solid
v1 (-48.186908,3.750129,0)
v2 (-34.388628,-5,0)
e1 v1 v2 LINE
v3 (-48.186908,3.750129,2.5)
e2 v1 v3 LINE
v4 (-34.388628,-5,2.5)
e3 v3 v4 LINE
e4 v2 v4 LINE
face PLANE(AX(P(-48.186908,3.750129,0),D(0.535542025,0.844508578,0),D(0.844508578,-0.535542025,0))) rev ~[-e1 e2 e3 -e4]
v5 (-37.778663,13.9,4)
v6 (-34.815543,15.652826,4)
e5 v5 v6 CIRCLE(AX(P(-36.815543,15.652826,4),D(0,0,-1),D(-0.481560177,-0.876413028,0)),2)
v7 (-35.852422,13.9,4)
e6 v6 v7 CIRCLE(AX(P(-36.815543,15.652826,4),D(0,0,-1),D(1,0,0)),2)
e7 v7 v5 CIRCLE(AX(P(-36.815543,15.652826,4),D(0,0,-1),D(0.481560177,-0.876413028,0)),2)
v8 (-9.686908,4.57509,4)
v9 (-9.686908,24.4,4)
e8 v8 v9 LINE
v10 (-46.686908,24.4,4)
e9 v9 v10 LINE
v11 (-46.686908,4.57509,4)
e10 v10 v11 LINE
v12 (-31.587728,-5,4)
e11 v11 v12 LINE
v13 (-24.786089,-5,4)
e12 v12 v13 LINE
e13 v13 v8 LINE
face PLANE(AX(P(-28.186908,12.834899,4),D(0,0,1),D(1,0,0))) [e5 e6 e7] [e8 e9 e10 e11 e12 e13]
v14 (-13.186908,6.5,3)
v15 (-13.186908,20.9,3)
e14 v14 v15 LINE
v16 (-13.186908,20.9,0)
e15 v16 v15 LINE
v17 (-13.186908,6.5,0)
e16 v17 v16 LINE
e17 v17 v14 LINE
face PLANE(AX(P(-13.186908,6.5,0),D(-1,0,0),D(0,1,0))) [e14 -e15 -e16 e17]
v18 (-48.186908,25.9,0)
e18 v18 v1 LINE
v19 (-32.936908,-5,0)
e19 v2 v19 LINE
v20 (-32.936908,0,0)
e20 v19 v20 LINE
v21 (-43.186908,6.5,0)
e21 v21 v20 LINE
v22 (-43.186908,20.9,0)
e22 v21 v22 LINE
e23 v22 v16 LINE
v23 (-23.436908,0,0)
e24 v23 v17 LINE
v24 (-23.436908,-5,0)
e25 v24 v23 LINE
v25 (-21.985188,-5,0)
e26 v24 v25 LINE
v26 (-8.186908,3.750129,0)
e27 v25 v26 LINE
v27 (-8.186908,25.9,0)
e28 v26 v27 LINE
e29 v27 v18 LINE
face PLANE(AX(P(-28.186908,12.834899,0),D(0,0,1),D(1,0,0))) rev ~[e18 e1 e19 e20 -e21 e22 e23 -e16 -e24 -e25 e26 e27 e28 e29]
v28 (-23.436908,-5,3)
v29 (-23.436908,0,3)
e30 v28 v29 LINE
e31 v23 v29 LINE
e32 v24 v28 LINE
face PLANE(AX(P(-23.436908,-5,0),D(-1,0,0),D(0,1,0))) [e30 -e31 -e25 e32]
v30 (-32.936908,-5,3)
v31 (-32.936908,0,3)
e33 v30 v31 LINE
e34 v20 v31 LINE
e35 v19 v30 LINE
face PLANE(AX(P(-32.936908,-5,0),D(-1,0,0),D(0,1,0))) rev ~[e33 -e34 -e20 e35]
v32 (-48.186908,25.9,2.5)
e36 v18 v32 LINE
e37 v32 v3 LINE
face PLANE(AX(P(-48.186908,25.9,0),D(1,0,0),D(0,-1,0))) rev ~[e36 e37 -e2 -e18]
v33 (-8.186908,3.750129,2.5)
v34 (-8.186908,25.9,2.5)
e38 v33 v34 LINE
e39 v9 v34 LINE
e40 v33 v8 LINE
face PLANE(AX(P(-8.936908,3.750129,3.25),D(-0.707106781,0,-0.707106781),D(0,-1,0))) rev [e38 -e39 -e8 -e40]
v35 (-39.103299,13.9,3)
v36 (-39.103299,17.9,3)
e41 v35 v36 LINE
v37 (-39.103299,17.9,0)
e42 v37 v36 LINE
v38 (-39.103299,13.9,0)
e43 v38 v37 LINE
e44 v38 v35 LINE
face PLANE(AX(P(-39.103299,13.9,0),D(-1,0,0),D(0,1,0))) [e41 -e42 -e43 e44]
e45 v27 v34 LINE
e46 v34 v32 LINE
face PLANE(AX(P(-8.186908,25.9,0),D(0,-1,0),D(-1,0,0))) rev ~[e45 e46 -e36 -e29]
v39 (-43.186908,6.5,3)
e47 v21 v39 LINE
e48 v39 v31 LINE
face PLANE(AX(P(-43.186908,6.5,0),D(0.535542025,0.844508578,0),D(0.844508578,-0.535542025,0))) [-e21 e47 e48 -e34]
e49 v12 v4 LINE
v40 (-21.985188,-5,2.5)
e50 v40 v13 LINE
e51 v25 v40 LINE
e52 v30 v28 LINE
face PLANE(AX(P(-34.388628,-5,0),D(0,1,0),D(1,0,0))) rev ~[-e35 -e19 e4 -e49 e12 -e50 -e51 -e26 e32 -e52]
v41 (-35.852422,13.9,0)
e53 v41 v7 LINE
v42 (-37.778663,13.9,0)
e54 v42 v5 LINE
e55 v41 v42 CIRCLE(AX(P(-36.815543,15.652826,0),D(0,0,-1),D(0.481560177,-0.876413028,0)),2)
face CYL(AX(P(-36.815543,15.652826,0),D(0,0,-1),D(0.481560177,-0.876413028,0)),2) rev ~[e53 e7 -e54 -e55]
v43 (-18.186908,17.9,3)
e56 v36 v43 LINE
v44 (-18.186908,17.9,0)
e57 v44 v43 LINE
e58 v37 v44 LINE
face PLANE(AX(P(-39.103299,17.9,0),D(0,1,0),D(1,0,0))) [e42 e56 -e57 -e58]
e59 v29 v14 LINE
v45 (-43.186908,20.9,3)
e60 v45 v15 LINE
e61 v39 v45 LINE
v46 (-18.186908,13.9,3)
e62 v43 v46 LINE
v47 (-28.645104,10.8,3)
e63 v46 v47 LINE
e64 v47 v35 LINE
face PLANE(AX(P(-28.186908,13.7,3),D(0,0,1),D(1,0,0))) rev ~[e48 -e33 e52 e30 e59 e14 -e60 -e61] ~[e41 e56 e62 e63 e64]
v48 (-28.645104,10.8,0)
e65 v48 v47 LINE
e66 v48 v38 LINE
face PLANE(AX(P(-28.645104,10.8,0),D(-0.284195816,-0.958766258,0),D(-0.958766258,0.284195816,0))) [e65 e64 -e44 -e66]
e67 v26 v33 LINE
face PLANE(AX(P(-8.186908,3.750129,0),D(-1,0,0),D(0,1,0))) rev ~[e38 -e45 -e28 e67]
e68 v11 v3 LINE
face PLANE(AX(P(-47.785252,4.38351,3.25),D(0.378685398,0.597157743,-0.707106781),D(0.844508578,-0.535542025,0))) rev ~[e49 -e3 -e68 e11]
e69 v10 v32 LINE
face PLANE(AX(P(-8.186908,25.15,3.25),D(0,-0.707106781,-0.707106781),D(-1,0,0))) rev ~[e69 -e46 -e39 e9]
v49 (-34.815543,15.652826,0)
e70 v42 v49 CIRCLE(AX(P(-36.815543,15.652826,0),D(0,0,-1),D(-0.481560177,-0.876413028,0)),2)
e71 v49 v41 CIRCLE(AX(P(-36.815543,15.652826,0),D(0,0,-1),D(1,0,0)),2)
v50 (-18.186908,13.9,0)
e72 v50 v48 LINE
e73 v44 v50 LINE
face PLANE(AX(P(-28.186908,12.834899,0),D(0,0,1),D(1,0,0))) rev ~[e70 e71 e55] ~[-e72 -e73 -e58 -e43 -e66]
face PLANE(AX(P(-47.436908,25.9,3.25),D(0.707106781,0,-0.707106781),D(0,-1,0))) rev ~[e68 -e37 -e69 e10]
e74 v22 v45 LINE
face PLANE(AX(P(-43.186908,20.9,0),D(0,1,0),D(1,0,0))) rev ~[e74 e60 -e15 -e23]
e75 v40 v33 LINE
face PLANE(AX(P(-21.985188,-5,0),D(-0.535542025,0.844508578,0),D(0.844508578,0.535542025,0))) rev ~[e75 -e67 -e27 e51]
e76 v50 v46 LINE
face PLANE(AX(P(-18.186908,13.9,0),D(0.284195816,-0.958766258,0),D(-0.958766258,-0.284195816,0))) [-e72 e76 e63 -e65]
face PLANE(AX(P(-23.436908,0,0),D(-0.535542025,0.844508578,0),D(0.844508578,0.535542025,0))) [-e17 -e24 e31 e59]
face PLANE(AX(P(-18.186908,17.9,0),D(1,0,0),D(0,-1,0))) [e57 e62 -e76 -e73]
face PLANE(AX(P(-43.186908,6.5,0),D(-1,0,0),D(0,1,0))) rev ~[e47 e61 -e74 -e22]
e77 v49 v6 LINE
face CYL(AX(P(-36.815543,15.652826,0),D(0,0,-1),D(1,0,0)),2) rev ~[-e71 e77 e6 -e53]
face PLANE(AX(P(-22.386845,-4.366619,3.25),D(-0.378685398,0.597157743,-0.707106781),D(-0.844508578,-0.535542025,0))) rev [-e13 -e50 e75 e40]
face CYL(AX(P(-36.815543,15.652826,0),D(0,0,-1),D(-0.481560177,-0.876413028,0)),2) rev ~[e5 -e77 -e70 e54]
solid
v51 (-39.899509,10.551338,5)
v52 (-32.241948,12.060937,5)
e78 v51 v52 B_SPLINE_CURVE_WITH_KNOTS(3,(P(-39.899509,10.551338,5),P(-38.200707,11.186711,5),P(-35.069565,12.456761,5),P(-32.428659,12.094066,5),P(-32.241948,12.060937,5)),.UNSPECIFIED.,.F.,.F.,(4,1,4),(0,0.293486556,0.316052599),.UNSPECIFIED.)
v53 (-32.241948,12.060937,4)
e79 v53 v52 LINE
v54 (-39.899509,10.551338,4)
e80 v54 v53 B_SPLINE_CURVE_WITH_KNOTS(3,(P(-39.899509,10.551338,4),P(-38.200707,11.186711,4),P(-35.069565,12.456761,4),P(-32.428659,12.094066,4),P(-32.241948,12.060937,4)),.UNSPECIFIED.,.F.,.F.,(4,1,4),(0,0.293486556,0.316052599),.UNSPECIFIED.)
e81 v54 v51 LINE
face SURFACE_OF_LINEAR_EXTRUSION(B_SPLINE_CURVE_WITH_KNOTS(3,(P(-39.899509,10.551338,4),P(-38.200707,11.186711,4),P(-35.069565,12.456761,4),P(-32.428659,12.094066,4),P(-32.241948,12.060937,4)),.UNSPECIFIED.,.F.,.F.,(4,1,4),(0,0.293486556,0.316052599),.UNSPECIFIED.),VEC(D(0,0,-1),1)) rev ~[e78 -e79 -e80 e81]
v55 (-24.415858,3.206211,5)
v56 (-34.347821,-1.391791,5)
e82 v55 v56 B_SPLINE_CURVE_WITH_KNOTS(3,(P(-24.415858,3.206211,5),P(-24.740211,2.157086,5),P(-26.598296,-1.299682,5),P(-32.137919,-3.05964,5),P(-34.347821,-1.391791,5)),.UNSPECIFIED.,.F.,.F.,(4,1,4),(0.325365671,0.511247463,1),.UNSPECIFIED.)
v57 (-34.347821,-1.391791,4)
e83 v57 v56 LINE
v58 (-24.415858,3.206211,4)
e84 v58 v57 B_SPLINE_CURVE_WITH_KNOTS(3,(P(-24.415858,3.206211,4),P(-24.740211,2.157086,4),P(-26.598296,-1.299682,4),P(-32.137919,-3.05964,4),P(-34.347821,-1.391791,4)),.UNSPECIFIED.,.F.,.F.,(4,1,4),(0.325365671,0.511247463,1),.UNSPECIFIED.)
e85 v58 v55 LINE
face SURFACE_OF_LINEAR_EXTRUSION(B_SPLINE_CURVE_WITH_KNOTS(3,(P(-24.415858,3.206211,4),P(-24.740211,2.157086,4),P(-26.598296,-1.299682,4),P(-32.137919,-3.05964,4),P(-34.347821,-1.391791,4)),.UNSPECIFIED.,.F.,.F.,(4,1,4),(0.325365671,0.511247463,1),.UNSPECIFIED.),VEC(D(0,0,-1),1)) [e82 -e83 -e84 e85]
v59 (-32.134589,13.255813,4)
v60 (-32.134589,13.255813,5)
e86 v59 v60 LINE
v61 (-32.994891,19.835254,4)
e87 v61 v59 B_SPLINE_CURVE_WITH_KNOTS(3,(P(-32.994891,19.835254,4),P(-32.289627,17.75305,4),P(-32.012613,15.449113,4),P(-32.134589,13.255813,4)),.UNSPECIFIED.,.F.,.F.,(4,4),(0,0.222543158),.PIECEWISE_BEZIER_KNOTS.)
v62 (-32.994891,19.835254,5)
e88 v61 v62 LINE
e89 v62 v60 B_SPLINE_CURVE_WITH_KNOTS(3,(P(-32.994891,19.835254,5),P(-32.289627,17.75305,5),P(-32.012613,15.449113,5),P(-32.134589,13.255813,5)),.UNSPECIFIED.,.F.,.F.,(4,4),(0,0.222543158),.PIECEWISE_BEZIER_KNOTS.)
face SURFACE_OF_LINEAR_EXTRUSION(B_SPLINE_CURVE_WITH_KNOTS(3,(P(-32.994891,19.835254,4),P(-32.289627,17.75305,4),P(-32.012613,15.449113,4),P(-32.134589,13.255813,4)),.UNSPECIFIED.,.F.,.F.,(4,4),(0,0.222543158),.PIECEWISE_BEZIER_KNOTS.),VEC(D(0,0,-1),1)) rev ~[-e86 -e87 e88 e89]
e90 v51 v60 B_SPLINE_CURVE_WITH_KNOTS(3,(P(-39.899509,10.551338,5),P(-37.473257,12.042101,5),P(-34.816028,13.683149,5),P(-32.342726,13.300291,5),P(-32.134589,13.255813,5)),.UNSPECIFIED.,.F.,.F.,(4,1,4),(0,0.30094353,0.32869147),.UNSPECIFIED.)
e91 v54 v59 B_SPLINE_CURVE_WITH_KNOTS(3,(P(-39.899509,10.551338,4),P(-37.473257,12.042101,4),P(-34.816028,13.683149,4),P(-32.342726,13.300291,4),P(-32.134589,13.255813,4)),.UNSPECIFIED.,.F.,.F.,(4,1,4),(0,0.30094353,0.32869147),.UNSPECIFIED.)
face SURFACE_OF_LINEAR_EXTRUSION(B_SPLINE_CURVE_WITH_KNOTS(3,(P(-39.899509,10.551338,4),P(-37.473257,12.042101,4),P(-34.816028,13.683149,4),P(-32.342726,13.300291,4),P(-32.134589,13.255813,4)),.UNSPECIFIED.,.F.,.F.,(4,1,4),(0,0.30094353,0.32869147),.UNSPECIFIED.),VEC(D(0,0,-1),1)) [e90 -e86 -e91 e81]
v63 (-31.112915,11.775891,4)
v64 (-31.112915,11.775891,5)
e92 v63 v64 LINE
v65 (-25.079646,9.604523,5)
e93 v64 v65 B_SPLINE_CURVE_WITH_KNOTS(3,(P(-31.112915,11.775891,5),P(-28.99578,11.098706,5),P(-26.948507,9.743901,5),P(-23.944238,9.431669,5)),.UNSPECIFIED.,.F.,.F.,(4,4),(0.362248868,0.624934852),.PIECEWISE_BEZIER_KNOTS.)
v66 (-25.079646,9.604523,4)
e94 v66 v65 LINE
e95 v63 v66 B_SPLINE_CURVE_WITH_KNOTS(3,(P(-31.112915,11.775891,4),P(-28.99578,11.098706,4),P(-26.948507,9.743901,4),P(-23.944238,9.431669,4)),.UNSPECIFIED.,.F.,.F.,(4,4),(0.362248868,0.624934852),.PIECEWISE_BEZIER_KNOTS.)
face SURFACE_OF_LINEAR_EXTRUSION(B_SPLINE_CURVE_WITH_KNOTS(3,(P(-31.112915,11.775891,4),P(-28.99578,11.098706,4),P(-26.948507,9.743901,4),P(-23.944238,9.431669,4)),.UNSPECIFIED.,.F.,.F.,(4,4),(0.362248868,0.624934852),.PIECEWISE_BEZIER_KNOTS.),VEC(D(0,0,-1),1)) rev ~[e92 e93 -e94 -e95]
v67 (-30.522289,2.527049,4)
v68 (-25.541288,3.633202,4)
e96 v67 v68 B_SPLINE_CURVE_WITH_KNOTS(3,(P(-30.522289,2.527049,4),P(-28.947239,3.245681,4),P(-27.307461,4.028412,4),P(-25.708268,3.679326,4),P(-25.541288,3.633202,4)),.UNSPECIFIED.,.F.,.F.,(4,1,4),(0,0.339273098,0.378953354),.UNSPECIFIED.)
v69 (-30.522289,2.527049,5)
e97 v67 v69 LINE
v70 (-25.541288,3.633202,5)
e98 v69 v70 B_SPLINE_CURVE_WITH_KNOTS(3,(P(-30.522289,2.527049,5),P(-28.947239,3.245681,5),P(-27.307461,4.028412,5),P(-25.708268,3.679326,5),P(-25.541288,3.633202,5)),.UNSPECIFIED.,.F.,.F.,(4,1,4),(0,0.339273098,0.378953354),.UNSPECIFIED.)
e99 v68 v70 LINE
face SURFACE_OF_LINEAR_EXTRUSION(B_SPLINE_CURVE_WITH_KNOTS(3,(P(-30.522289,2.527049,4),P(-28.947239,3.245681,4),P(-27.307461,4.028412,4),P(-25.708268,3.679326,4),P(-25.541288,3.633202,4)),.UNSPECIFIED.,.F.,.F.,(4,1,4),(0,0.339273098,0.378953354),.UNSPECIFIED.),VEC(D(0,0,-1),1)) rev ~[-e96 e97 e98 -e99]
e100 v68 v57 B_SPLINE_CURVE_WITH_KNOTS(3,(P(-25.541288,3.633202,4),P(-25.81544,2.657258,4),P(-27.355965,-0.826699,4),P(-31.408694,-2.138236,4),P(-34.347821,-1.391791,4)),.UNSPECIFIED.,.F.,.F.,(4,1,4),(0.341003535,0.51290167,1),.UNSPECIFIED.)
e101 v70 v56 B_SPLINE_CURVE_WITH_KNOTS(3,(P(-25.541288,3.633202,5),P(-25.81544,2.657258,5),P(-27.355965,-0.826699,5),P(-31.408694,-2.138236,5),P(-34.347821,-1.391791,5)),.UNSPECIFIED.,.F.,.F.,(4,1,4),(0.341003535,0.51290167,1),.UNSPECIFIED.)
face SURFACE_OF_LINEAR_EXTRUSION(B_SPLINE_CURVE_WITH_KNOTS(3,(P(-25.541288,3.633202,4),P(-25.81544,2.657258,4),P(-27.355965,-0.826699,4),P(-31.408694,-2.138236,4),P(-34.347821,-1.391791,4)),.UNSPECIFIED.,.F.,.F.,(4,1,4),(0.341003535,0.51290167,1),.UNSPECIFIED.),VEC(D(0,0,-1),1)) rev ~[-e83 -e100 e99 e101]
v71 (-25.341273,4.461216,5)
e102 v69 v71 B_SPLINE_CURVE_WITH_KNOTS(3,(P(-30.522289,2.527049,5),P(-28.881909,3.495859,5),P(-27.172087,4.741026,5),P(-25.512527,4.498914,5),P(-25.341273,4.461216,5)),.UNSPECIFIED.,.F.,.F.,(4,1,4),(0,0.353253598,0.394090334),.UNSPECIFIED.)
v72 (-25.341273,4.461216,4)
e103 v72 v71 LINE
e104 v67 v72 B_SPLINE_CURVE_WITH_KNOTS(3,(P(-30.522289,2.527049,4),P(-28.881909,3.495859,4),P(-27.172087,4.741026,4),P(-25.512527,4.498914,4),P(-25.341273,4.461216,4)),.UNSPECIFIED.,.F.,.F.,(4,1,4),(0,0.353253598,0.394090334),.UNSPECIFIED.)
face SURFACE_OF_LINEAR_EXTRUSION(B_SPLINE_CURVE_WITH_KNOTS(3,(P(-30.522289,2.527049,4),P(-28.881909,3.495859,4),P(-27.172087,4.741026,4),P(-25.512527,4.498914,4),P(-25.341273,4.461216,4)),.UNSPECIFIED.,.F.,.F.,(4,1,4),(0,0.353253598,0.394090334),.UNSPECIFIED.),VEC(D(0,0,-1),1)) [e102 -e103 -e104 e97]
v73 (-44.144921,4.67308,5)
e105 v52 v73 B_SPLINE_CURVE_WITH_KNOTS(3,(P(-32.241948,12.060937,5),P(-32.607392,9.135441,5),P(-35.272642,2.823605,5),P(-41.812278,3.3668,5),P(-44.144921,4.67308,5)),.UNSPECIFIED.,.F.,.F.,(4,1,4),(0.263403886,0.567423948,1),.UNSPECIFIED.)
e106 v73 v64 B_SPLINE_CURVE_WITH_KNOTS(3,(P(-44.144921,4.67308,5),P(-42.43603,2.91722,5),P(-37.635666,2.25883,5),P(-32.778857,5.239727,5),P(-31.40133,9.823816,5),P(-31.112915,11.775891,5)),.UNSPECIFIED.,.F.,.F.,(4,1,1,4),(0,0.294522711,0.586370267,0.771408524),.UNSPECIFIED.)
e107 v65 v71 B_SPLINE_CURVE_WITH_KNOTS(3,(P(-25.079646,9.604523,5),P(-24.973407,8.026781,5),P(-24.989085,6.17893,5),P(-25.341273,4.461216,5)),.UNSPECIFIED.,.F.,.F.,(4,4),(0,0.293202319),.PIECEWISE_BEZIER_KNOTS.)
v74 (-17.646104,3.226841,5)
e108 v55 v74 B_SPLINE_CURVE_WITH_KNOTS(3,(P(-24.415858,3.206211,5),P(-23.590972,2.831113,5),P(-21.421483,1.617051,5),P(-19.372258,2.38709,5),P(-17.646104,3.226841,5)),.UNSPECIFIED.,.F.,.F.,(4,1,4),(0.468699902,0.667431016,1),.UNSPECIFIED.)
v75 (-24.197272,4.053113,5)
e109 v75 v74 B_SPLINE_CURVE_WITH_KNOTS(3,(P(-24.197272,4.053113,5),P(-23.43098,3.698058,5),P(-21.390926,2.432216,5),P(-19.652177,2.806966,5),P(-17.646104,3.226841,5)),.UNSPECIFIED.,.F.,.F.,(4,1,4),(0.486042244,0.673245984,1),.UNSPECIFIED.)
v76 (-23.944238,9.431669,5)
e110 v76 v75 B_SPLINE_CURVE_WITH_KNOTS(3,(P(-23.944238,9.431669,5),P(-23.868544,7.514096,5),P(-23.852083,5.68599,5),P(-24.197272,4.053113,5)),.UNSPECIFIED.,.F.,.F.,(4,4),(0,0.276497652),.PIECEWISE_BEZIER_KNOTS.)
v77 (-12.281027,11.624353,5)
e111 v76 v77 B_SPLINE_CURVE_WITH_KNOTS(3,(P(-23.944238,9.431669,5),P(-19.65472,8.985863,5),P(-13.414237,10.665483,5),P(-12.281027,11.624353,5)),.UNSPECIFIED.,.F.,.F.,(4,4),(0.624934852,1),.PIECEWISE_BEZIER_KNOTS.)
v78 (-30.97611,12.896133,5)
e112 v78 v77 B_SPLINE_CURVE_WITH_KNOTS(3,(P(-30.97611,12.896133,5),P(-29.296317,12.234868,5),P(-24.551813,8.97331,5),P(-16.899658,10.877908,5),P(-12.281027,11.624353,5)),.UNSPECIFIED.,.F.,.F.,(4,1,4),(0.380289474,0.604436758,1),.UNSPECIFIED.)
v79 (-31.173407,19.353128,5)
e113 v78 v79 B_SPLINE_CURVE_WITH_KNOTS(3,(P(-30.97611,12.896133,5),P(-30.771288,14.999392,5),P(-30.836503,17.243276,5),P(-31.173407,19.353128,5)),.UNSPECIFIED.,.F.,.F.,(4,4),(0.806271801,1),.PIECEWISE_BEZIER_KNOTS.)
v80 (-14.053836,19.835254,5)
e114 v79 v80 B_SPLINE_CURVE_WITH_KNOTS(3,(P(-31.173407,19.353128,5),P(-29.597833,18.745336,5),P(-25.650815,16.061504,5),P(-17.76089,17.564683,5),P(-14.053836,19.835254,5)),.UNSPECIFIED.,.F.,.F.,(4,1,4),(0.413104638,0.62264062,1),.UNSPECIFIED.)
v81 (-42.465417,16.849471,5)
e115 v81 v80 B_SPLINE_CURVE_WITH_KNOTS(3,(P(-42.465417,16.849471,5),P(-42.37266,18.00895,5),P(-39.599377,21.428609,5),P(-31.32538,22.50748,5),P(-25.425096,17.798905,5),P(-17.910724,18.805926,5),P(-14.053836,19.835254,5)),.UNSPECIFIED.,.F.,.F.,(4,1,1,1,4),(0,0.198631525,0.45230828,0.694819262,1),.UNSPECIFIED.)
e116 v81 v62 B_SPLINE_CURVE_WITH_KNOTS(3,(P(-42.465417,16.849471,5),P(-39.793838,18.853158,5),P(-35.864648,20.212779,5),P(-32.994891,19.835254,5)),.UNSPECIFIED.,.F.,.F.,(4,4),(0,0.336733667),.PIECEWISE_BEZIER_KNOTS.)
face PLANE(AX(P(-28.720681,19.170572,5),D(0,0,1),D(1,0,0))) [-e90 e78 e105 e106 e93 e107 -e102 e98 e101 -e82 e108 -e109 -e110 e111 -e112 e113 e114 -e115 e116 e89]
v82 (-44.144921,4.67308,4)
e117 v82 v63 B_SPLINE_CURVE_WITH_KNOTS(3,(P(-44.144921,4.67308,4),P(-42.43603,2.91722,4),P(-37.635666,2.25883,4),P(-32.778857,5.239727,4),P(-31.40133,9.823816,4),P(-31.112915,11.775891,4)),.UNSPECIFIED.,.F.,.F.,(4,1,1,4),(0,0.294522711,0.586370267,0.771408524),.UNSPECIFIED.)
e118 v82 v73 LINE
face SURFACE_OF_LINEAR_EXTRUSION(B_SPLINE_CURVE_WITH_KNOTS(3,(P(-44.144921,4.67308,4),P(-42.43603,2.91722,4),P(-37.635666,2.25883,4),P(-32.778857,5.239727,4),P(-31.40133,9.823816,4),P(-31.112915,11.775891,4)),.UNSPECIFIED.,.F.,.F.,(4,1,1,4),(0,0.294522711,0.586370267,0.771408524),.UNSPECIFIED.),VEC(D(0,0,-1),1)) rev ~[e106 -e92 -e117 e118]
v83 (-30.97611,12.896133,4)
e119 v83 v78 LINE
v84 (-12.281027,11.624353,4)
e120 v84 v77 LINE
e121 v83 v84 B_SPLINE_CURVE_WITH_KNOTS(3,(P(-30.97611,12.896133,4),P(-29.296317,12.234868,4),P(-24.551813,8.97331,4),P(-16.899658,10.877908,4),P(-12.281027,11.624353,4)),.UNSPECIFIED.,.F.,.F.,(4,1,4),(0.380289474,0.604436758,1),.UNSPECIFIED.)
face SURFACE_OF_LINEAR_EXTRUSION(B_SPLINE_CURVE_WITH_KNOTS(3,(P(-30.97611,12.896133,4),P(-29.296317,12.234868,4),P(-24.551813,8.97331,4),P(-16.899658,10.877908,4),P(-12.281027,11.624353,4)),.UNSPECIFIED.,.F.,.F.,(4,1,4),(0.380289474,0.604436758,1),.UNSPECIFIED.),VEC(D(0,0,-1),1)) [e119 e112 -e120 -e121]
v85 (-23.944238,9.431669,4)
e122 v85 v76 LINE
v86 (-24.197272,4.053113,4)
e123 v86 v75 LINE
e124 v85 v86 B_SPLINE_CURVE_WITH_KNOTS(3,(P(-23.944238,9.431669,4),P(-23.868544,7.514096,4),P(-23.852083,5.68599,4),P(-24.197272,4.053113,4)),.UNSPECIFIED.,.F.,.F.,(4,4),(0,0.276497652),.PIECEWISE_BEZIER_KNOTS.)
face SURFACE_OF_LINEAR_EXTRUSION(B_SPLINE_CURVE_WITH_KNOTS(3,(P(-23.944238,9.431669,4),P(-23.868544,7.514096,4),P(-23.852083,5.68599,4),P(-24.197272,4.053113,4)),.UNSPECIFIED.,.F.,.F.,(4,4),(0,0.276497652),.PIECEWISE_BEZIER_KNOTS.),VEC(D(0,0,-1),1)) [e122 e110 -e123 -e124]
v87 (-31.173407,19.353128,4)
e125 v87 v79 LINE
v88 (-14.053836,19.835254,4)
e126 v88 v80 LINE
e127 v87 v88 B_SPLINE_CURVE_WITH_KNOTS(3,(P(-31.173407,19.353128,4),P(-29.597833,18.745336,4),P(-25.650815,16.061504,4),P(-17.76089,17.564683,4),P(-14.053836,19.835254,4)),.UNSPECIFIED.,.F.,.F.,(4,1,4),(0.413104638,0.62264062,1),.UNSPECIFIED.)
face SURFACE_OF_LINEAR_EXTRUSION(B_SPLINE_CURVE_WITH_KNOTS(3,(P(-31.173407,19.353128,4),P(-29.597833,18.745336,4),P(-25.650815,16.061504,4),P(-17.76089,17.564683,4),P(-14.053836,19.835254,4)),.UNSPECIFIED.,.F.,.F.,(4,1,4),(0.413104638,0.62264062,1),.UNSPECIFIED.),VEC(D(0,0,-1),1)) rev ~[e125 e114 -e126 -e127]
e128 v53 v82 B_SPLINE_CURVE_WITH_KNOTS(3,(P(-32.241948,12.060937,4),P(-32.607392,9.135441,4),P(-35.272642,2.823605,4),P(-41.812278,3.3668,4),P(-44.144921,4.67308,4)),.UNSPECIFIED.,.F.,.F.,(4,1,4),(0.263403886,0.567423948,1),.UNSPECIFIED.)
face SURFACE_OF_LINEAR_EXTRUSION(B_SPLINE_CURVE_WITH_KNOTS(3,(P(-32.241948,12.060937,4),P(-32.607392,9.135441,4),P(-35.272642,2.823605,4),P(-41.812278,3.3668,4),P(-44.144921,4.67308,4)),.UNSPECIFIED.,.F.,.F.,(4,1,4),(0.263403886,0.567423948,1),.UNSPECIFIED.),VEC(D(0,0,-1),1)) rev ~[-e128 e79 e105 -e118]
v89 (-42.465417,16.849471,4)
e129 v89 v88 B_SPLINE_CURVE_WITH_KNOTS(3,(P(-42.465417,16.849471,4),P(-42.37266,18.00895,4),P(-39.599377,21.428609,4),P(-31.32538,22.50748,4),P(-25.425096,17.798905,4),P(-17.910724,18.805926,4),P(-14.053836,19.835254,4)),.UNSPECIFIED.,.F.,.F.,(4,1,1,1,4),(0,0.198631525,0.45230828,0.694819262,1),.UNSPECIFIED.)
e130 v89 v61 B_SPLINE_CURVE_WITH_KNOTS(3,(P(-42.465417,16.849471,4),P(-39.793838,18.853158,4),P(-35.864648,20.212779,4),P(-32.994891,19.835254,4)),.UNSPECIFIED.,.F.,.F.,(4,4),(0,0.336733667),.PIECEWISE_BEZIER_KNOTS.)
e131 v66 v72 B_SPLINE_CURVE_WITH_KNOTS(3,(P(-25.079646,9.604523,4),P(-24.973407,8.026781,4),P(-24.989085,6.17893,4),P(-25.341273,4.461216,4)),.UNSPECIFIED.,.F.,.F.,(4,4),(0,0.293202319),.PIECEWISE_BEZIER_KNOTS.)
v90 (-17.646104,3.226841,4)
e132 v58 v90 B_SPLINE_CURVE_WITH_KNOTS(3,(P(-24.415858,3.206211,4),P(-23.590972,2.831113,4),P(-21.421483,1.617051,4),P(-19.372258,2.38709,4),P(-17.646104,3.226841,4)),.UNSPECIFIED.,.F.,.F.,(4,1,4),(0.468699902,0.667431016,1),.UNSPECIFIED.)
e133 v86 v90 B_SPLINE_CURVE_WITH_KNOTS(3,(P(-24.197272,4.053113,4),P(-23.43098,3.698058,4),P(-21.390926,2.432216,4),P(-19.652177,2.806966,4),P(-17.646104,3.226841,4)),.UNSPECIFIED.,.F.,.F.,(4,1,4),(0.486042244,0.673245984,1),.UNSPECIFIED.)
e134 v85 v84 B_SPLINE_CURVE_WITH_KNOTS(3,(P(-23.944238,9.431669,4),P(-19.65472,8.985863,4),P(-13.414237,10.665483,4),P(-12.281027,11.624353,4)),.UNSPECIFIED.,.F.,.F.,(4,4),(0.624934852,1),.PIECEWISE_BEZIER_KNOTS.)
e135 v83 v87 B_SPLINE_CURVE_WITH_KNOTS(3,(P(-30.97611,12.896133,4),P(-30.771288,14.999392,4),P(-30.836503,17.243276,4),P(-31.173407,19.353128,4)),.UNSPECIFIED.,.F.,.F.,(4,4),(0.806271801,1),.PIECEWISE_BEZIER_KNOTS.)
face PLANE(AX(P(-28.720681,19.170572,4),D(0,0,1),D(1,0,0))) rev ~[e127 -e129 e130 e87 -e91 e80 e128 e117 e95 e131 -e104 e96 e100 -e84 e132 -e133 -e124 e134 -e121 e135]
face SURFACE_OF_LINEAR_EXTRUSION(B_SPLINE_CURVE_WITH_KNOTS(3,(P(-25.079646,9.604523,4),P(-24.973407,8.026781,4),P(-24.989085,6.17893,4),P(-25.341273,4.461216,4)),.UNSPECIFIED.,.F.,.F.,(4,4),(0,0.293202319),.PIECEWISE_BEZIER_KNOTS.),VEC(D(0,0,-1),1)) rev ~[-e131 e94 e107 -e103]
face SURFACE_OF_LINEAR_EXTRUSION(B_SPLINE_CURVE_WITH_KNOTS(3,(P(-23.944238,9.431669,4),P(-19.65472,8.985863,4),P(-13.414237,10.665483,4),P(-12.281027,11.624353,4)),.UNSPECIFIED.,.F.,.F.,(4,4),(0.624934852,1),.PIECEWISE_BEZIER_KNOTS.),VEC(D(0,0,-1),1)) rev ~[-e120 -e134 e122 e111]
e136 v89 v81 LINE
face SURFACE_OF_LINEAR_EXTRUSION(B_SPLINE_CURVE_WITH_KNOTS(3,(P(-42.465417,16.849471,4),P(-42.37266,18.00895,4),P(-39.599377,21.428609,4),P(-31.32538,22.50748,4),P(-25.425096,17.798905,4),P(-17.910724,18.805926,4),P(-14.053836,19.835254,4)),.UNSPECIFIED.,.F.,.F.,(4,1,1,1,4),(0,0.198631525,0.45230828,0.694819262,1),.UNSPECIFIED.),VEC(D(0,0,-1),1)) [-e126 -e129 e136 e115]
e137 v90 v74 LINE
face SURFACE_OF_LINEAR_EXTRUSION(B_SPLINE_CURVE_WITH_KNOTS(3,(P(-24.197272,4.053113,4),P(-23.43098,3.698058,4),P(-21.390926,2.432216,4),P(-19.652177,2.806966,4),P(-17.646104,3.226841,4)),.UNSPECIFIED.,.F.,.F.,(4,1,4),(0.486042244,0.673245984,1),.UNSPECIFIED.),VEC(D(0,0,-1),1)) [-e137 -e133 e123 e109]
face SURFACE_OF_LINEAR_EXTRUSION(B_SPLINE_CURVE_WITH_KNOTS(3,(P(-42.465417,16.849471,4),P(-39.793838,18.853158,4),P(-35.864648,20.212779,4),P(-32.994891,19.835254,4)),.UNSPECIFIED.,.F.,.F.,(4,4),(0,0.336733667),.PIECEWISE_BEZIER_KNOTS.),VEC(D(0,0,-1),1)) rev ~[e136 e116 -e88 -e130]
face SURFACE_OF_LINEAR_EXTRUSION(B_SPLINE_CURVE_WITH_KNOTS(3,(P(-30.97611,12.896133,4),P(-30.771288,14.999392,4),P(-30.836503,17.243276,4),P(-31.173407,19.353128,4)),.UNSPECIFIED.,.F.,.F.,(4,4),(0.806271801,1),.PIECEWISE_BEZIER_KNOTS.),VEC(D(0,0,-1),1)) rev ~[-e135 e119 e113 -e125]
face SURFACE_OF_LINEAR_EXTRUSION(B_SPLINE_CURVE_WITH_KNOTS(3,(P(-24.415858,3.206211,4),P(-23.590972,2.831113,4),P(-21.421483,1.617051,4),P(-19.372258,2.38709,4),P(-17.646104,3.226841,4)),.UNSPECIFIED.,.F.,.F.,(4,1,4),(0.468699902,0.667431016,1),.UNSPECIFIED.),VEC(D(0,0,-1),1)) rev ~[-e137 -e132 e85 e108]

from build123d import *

# Parameters (mm, degrees)
F0_W     = 30
F0_H     = 14.4
F0_W_2   = 9.5
F0_H_2   = 5
F1_DEPTH = 4
F2_DEPTH = 3
F4_DEPTH = 1
F5_SIZE  = 1.5


with BuildPart() as f1:
    # F0 (on Top) → F1 (new body)
    with BuildSketch(Plane.XY):
        Polygon((-43.1869083047, 6.5), (-43.1869083047, 20.9), (-13.1869083047, 20.9), (-13.1869083047, 6.5), (-23.4369083047, 0), (-23.4369083047, -5), (-21.9851882324, -5), (-8.1869083047, 3.7501287347), (-8.1869083047, 25.9), (-48.1869083047, 25.9), (-48.1869083047, 3.7501287347), (-34.388628377, -5), (-32.9369083047, -5), (-32.9369083047, 0), align=None)
        with Locations((-28.1869083047, 13.7)):
            Rectangle(F0_W, F0_H)
        Polygon((-39.1032992899, 13.9), (-39.1032992899, 17.9), (-18.1869083047, 17.9), (-18.1869083047, 13.9), (-28.6451037973, 10.8), align=None, mode=Mode.SUBTRACT)
        Polygon((-13.1869083047, 6.5), (-43.1869083047, 6.5), (-32.9369083047, 0), (-23.4369083047, 0), align=None)
        with Locations((-28.1869083047, -2.5)):
            Rectangle(F0_W_2, F0_H_2)
        with BuildLine():
            Line((-18.1869083047, 17.9), (-39.1032992899, 17.9))
            Line((-39.1032992899, 17.9), (-39.1032992899, 13.9))
            Line((-39.1032992899, 13.9), (-37.7786630825, 13.9))
            ThreePointArc((-37.7786630825, 13.9), (-37.8338156014, 17.3741977051), (-34.8155427277, 15.6528260559))
            ThreePointArc((-34.8155427277, 15.6528260559), (-35.0941710785, 14.6345531822), (-35.8524223729, 13.9))
            Line((-35.8524223729, 13.9), (-18.1869083047, 13.9))
            Line((-18.1869083047, 13.9), (-18.1869083047, 17.9))
        make_face()
        with BuildLine():
            Line((-37.7786630825, 13.9), (-39.1032992899, 13.9))
            Line((-39.1032992899, 13.9), (-28.6451037973, 10.8))
            Line((-28.6451037973, 10.8), (-18.1869083047, 13.9))
            Line((-18.1869083047, 13.9), (-35.8524223729, 13.9))
            ThreePointArc((-35.8524223729, 13.9), (-36.8155427277, 13.6528260559), (-37.7786630825, 13.9))
        make_face()
    extrude(amount=F1_DEPTH)

    # F0 (on Top) → F2 (cut)
    with BuildSketch(Plane.XY):
        with Locations((-28.1869083047, 13.7)):
            Rectangle(F0_W, F0_H)
        Polygon((-39.1032992899, 13.9), (-39.1032992899, 17.9), (-18.1869083047, 17.9), (-18.1869083047, 13.9), (-28.6451037973, 10.8), align=None, mode=Mode.SUBTRACT)
        Polygon((-13.1869083047, 6.5), (-43.1869083047, 6.5), (-32.9369083047, 0), (-23.4369083047, 0), align=None)
        with Locations((-28.1869083047, -2.5)):
            Rectangle(F0_W_2, F0_H_2)
    extrude(amount=F2_DEPTH, mode=Mode.SUBTRACT)

    # F5
    f5_edges = [f1.edges().sort_by_distance(p)[0] for p in [
        (-41.287768, -0.624936, 4),
        (-48.186908, 14.825064, 4),
        (-28.186908, 25.9, 4),
        (-8.186908, 14.825064, 4),
        (-15.086048, -0.624936, 4),
    ]]
    chamfer(f5_edges, length=F5_SIZE)


with BuildPart() as f4:
    # F3 (on face) → F4 (new body)
    with BuildSketch(Plane.XY.offset(4)):
        with BuildLine():
            add(Edge.make_bspline(
                [(-42.4654167145, 16.8494712561), (-39.7938375841, 18.8531576552), (-35.864648273, 20.2127791296), (-32.9948905855, 19.8352541775)],
                knots=[0, 0, 0, 0, 0.3367336674, 0.3367336674, 0.3367336674, 0.3367336674], degree=3))
            add(Edge.make_bspline(
                [(-32.9948905855, 19.8352541775), (-32.3440314578, 19.7496317703), (-31.7476673073, 19.5746541344), (-31.1734072618, 19.3531280695)],
                knots=[0.3367336674, 0.3367336674, 0.3367336674, 0.3367336674, 0.4131046384, 0.4131046384, 0.4131046384, 0.4131046384], degree=3))
            add(Edge.make_bspline(
                [(-31.1734072618, 19.3531280695), (-29.5978329229, 18.7453358574), (-25.6508147134, 16.0615042571), (-17.7608904848, 17.5646834939), (-14.0538355336, 19.8352541775)],
                knots=[0.4131046384, 0.4131046384, 0.4131046384, 0.4131046384, 0.6226406196, 1, 1, 1, 1], degree=3))
            add(Edge.make_bspline(
                [(-42.4654167145, 16.8494712561), (-42.3726604929, 18.008949951), (-39.5993766245, 21.4286085388), (-31.3253802251, 22.5074804398), (-25.4250962682, 17.798905064), (-17.9107243535, 18.8059261112), (-14.0538355336, 19.8352541775)],
                knots=[0, 0, 0, 0, 0.1986315254, 0.4523082805, 0.6948192618, 1, 1, 1, 1], degree=3))
        make_face()
        with BuildLine():
            add(Edge.make_bspline(
                [(-32.9948905855, 19.8352541775), (-32.3440314578, 19.7496317703), (-31.7476673073, 19.5746541344), (-31.1734072618, 19.3531280695)],
                knots=[0.3367336674, 0.3367336674, 0.3367336674, 0.3367336674, 0.4131046384, 0.4131046384, 0.4131046384, 0.4131046384], degree=3))
            add(Edge.make_bspline(
                [(-32.9948905855, 19.8352541775), (-32.2896273329, 17.753049629), (-32.0126127544, 15.4491126865), (-32.1345889722, 13.255812889)],
                knots=[0, 0, 0, 0, 0.2225431575, 0.2225431575, 0.2225431575, 0.2225431575], degree=3))
            add(Edge.make_bspline(
                [(-32.134588974, 13.2558128888), (-31.7475533394, 13.1731038166), (-31.3627928139, 13.0483545557), (-30.9761098202, 12.8961333799)],
                knots=[0.3286914696, 0.3286914696, 0.3286914696, 0.3286914696, 0.3802894739, 0.3802894739, 0.3802894739, 0.3802894739], degree=3))
            add(Edge.make_bspline(
                [(-30.976109827, 12.8961333789), (-30.7712879528, 14.9993919589), (-30.8365034569, 17.2432759127), (-31.1734072618, 19.3531280695)],
                knots=[0.8062718014, 0.8062718014, 0.8062718014, 0.8062718014, 1, 1, 1, 1], degree=3))
        make_face()
        with BuildLine():
            add(Edge.make_bspline(
                [(-32.1345889722, 13.255812889), (-32.1569847951, 12.8531052564), (-32.1928313712, 12.4541274165), (-32.2419476004, 12.0609366653)],
                knots=[0.2225431575, 0.2225431575, 0.2225431575, 0.2225431575, 0.2634038863, 0.2634038863, 0.2634038863, 0.2634038863], degree=3))
            add(Edge.make_bspline(
                [(-39.8995094001, 10.551338084), (-37.4732565623, 12.0421009296), (-34.8160280141, 13.6831493791), (-32.3427257342, 13.3002914763), (-32.134588974, 13.2558128888)],
                knots=[0, 0, 0, 0, 0.3009435298, 0.3286914696, 0.3286914696, 0.3286914696, 0.3286914696], degree=3))
            add(Edge.make_bspline(
                [(-39.8995094001, 10.551338084), (-38.2007072715, 11.1867110314), (-35.0695646892, 12.456761007), (-32.4286591287, 12.094066028), (-32.2419476145, 12.0609366664)],
                knots=[0, 0, 0, 0, 0.2934865557, 0.3160525993, 0.3160525993, 0.3160525993, 0.3160525993], degree=3))
        make_face()
        with BuildLine():
            add(Edge.make_bspline(
                [(-30.9761098202, 12.8961333799), (-29.2963172809, 12.23486821), (-24.551812522, 8.9733096857), (-16.899658367, 10.8779082075), (-12.2810266912, 11.6243530065)],
                knots=[0.3802894739, 0.3802894739, 0.3802894739, 0.3802894739, 0.6044367579, 1, 1, 1, 1], degree=3))
            add(Edge.make_bspline(
                [(-31.112915177, 11.7758911415), (-31.0585745099, 12.1436838454), (-31.0129695193, 12.5176314999), (-30.976109827, 12.8961333789)],
                knots=[0.771408524, 0.771408524, 0.771408524, 0.771408524, 0.8062718014, 0.8062718014, 0.8062718014, 0.8062718014], degree=3))
            add(Edge.make_bspline(
                [(-31.1129151777, 11.7758911415), (-29.2735553981, 11.1875546271), (-27.486927637, 10.0877460543), (-25.0796457725, 9.6045233315)],
                knots=[0.362248868, 0.362248868, 0.362248868, 0.362248868, 0.590469567, 0.590469567, 0.590469567, 0.590469567], degree=3))
            add(Edge.make_bspline(
                [(-25.0796457725, 9.6045233315), (-24.7161044464, 9.5315483168), (-24.3384083341, 9.4726353068), (-23.9442382008, 9.4316694885)],
                knots=[0.590469567, 0.590469567, 0.590469567, 0.590469567, 0.624934852, 0.624934852, 0.624934852, 0.624934852], degree=3))
            add(Edge.make_bspline(
                [(-23.9442382008, 9.4316694885), (-19.6547196513, 8.985862913), (-13.4142369665, 10.665483242), (-12.2810266912, 11.6243530065)],
                knots=[0.624934852, 0.624934852, 0.624934852, 0.624934852, 1, 1, 1, 1], degree=3))
        make_face()
        with BuildLine():
            add(Edge.make_bspline(
                [(-32.134588974, 13.2558128888), (-31.7475533394, 13.1731038166), (-31.3627928139, 13.0483545557), (-30.9761098202, 12.8961333799)],
                knots=[0.3286914696, 0.3286914696, 0.3286914696, 0.3286914696, 0.3802894739, 0.3802894739, 0.3802894739, 0.3802894739], degree=3))
            add(Edge.make_bspline(
                [(-32.1345889722, 13.255812889), (-32.1569847951, 12.8531052564), (-32.1928313712, 12.4541274165), (-32.2419476004, 12.0609366653)],
                knots=[0.2225431575, 0.2225431575, 0.2225431575, 0.2225431575, 0.2634038863, 0.2634038863, 0.2634038863, 0.2634038863], degree=3))
            add(Edge.make_bspline(
                [(-32.2419476145, 12.0609366664), (-31.8597195461, 11.9931156113), (-31.4852370526, 11.8949817928), (-31.1129151777, 11.7758911415)],
                knots=[0.3160525993, 0.3160525993, 0.3160525993, 0.3160525993, 0.362248868, 0.362248868, 0.362248868, 0.362248868], degree=3))
            add(Edge.make_bspline(
                [(-31.112915177, 11.7758911415), (-31.0585745099, 12.1436838454), (-31.0129695193, 12.5176314999), (-30.976109827, 12.8961333789)],
                knots=[0.771408524, 0.771408524, 0.771408524, 0.771408524, 0.8062718014, 0.8062718014, 0.8062718014, 0.8062718014], degree=3))
        make_face()
        with BuildLine():
            add(Edge.make_bspline(
                [(-32.2419476145, 12.0609366664), (-31.8597195461, 11.9931156113), (-31.4852370526, 11.8949817928), (-31.1129151777, 11.7758911415)],
                knots=[0.3160525993, 0.3160525993, 0.3160525993, 0.3160525993, 0.362248868, 0.362248868, 0.362248868, 0.362248868], degree=3))
            add(Edge.make_bspline(
                [(-32.2419476004, 12.0609366653), (-32.6073918669, 9.1354412048), (-35.2726418826, 2.8236045142), (-41.8122783303, 3.3667995594), (-44.1449210048, 4.6730795875)],
                knots=[0.2634038863, 0.2634038863, 0.2634038863, 0.2634038863, 0.5674239482, 1, 1, 1, 1], degree=3))
            add(Edge.make_bspline(
                [(-44.1449210048, 4.6730795875), (-42.4360304347, 2.9172204585), (-37.6356661883, 2.2588303615), (-32.7788568242, 5.2397269583), (-31.4013304686, 9.8238164685), (-31.112915177, 11.7758911415)],
                knots=[0, 0, 0, 0, 0.2945227107, 0.5863702675, 0.771408524, 0.771408524, 0.771408524, 0.771408524], degree=3))
        make_face()
        with BuildLine():
            add(Edge.make_bspline(
                [(-25.0796457725, 9.6045233315), (-24.7161044464, 9.5315483168), (-24.3384083341, 9.4726353068), (-23.9442382008, 9.4316694885)],
                knots=[0.590469567, 0.590469567, 0.590469567, 0.590469567, 0.624934852, 0.624934852, 0.624934852, 0.624934852], degree=3))
            add(Edge.make_bspline(
                [(-25.0796457725, 9.6045233315), (-24.9734072616, 8.0267808085), (-24.9890853523, 6.1789301298), (-25.3412728696, 4.4612159346)],
                knots=[0, 0, 0, 0, 0.2932023186, 0.2932023186, 0.2932023186, 0.2932023186], degree=3))
            add(Edge.make_bspline(
                [(-25.3412728564, 4.4612159321), (-24.9556596717, 4.3763306971), (-24.5736644604, 4.2275105969), (-24.197272273, 4.053112762)],
                knots=[0.3940903335, 0.3940903335, 0.3940903335, 0.3940903335, 0.486042244, 0.486042244, 0.486042244, 0.486042244], degree=3))
            add(Edge.make_bspline(
                [(-23.9442382008, 9.4316694885), (-23.8685441759, 7.5140960035), (-23.8520826412, 5.6859897217), (-24.1972722811, 4.053112762)],
                knots=[0, 0, 0, 0, 0.2764976522, 0.2764976522, 0.2764976522, 0.2764976522], degree=3))
        make_face()
        with BuildLine():
            add(Edge.make_bspline(
                [(-24.197272273, 4.053112762), (-23.4309801461, 3.6980584003), (-21.3909257082, 2.4322158399), (-19.6521766484, 2.8069657274), (-17.6461040974, 3.2268413343)],
                knots=[0.486042244, 0.486042244, 0.486042244, 0.486042244, 0.6732459838, 1, 1, 1, 1], degree=3))
            add(Edge.make_bspline(
                [(-24.1972722811, 4.053112762), (-24.258280878, 3.7645191292), (-24.3305863011, 3.482023836), (-24.4158581353, 3.2062107713)],
                knots=[0.2764976522, 0.2764976522, 0.2764976522, 0.2764976522, 0.325365671, 0.325365671, 0.325365671, 0.325365671], degree=3))
            add(Edge.make_bspline(
                [(-24.4158581101, 3.2062107668), (-23.590972038, 2.8311126201), (-21.4214831622, 1.6170506773), (-19.3722583354, 2.3870898876), (-17.6461040974, 3.2268413343)],
                knots=[0.4686999018, 0.4686999018, 0.4686999018, 0.4686999018, 0.6674310157, 1, 1, 1, 1], degree=3))
        make_face()
        with BuildLine():
            add(Edge.make_bspline(
                [(-25.3412728564, 4.4612159321), (-24.9556596717, 4.3763306971), (-24.5736644604, 4.2275105969), (-24.197272273, 4.053112762)],
                knots=[0.3940903335, 0.3940903335, 0.3940903335, 0.3940903335, 0.486042244, 0.486042244, 0.486042244, 0.486042244], degree=3))
            add(Edge.make_bspline(
                [(-25.3412728696, 4.4612159346), (-25.3986905319, 4.1811743976), (-25.4650523701, 3.9045917937), (-25.5412882704, 3.6332024867)],
                knots=[0.2932023186, 0.2932023186, 0.2932023186, 0.2932023186, 0.341003535, 0.341003535, 0.341003535, 0.341003535], degree=3))
            add(Edge.make_bspline(
                [(-25.541288286, 3.6332024911), (-25.1636236146, 3.5288828613), (-24.7883749037, 3.375604291), (-24.4158581101, 3.2062107668)],
                knots=[0.3789533539, 0.3789533539, 0.3789533539, 0.3789533539, 0.4686999018, 0.4686999018, 0.4686999018, 0.4686999018], degree=3))
            add(Edge.make_bspline(
                [(-24.1972722811, 4.053112762), (-24.258280878, 3.7645191292), (-24.3305863011, 3.482023836), (-24.4158581353, 3.2062107713)],
                knots=[0.2764976522, 0.2764976522, 0.2764976522, 0.2764976522, 0.325365671, 0.325365671, 0.325365671, 0.325365671], degree=3))
        make_face()
        with BuildLine():
            add(Edge.make_bspline(
                [(-25.3412728696, 4.4612159346), (-25.3986905319, 4.1811743976), (-25.4650523701, 3.9045917937), (-25.5412882704, 3.6332024867)],
                knots=[0.2932023186, 0.2932023186, 0.2932023186, 0.2932023186, 0.341003535, 0.341003535, 0.341003535, 0.341003535], degree=3))
            add(Edge.make_bspline(
                [(-30.5222887546, 2.5270488113), (-28.8819089365, 3.4958588937), (-27.1720866653, 4.7410257623), (-25.5125274132, 4.4989142885), (-25.3412728564, 4.4612159321)],
                knots=[0, 0, 0, 0, 0.3532535978, 0.3940903335, 0.3940903335, 0.3940903335, 0.3940903335], degree=3))
            add(Edge.make_bspline(
                [(-30.5222887546, 2.5270488113), (-28.9472388962, 3.2456805901), (-27.3074611458, 4.0284117853), (-25.7082677545, 3.6793260437), (-25.541288286, 3.6332024911)],
                knots=[0, 0, 0, 0, 0.3392730978, 0.3789533539, 0.3789533539, 0.3789533539, 0.3789533539], degree=3))
        make_face()
        with BuildLine():
            add(Edge.make_bspline(
                [(-25.541288286, 3.6332024911), (-25.1636236146, 3.5288828613), (-24.7883749037, 3.375604291), (-24.4158581101, 3.2062107668)],
                knots=[0.3789533539, 0.3789533539, 0.3789533539, 0.3789533539, 0.4686999018, 0.4686999018, 0.4686999018, 0.4686999018], degree=3))
            add(Edge.make_bspline(
                [(-25.5412882704, 3.6332024867), (-25.8154404803, 2.6572583722), (-27.3559647856, -0.8266993526), (-31.4086936414, -2.1382363047), (-34.347821027, -1.3917906908)],
                knots=[0.341003535, 0.341003535, 0.341003535, 0.341003535, 0.5129016702, 1, 1, 1, 1], degree=3))
            add(Edge.make_bspline(
                [(-24.4158581353, 3.2062107713), (-24.7402109886, 2.1570864562), (-26.5982963118, -1.2996818857), (-32.1379193429, -3.0596398465), (-34.347821027, -1.3917906908)],
                knots=[0.325365671, 0.325365671, 0.325365671, 0.325365671, 0.511247463, 1, 1, 1, 1], degree=3))
        make_face()
    extrude(amount=F4_DEPTH)


solid = Compound([f1.part, f4.part])
